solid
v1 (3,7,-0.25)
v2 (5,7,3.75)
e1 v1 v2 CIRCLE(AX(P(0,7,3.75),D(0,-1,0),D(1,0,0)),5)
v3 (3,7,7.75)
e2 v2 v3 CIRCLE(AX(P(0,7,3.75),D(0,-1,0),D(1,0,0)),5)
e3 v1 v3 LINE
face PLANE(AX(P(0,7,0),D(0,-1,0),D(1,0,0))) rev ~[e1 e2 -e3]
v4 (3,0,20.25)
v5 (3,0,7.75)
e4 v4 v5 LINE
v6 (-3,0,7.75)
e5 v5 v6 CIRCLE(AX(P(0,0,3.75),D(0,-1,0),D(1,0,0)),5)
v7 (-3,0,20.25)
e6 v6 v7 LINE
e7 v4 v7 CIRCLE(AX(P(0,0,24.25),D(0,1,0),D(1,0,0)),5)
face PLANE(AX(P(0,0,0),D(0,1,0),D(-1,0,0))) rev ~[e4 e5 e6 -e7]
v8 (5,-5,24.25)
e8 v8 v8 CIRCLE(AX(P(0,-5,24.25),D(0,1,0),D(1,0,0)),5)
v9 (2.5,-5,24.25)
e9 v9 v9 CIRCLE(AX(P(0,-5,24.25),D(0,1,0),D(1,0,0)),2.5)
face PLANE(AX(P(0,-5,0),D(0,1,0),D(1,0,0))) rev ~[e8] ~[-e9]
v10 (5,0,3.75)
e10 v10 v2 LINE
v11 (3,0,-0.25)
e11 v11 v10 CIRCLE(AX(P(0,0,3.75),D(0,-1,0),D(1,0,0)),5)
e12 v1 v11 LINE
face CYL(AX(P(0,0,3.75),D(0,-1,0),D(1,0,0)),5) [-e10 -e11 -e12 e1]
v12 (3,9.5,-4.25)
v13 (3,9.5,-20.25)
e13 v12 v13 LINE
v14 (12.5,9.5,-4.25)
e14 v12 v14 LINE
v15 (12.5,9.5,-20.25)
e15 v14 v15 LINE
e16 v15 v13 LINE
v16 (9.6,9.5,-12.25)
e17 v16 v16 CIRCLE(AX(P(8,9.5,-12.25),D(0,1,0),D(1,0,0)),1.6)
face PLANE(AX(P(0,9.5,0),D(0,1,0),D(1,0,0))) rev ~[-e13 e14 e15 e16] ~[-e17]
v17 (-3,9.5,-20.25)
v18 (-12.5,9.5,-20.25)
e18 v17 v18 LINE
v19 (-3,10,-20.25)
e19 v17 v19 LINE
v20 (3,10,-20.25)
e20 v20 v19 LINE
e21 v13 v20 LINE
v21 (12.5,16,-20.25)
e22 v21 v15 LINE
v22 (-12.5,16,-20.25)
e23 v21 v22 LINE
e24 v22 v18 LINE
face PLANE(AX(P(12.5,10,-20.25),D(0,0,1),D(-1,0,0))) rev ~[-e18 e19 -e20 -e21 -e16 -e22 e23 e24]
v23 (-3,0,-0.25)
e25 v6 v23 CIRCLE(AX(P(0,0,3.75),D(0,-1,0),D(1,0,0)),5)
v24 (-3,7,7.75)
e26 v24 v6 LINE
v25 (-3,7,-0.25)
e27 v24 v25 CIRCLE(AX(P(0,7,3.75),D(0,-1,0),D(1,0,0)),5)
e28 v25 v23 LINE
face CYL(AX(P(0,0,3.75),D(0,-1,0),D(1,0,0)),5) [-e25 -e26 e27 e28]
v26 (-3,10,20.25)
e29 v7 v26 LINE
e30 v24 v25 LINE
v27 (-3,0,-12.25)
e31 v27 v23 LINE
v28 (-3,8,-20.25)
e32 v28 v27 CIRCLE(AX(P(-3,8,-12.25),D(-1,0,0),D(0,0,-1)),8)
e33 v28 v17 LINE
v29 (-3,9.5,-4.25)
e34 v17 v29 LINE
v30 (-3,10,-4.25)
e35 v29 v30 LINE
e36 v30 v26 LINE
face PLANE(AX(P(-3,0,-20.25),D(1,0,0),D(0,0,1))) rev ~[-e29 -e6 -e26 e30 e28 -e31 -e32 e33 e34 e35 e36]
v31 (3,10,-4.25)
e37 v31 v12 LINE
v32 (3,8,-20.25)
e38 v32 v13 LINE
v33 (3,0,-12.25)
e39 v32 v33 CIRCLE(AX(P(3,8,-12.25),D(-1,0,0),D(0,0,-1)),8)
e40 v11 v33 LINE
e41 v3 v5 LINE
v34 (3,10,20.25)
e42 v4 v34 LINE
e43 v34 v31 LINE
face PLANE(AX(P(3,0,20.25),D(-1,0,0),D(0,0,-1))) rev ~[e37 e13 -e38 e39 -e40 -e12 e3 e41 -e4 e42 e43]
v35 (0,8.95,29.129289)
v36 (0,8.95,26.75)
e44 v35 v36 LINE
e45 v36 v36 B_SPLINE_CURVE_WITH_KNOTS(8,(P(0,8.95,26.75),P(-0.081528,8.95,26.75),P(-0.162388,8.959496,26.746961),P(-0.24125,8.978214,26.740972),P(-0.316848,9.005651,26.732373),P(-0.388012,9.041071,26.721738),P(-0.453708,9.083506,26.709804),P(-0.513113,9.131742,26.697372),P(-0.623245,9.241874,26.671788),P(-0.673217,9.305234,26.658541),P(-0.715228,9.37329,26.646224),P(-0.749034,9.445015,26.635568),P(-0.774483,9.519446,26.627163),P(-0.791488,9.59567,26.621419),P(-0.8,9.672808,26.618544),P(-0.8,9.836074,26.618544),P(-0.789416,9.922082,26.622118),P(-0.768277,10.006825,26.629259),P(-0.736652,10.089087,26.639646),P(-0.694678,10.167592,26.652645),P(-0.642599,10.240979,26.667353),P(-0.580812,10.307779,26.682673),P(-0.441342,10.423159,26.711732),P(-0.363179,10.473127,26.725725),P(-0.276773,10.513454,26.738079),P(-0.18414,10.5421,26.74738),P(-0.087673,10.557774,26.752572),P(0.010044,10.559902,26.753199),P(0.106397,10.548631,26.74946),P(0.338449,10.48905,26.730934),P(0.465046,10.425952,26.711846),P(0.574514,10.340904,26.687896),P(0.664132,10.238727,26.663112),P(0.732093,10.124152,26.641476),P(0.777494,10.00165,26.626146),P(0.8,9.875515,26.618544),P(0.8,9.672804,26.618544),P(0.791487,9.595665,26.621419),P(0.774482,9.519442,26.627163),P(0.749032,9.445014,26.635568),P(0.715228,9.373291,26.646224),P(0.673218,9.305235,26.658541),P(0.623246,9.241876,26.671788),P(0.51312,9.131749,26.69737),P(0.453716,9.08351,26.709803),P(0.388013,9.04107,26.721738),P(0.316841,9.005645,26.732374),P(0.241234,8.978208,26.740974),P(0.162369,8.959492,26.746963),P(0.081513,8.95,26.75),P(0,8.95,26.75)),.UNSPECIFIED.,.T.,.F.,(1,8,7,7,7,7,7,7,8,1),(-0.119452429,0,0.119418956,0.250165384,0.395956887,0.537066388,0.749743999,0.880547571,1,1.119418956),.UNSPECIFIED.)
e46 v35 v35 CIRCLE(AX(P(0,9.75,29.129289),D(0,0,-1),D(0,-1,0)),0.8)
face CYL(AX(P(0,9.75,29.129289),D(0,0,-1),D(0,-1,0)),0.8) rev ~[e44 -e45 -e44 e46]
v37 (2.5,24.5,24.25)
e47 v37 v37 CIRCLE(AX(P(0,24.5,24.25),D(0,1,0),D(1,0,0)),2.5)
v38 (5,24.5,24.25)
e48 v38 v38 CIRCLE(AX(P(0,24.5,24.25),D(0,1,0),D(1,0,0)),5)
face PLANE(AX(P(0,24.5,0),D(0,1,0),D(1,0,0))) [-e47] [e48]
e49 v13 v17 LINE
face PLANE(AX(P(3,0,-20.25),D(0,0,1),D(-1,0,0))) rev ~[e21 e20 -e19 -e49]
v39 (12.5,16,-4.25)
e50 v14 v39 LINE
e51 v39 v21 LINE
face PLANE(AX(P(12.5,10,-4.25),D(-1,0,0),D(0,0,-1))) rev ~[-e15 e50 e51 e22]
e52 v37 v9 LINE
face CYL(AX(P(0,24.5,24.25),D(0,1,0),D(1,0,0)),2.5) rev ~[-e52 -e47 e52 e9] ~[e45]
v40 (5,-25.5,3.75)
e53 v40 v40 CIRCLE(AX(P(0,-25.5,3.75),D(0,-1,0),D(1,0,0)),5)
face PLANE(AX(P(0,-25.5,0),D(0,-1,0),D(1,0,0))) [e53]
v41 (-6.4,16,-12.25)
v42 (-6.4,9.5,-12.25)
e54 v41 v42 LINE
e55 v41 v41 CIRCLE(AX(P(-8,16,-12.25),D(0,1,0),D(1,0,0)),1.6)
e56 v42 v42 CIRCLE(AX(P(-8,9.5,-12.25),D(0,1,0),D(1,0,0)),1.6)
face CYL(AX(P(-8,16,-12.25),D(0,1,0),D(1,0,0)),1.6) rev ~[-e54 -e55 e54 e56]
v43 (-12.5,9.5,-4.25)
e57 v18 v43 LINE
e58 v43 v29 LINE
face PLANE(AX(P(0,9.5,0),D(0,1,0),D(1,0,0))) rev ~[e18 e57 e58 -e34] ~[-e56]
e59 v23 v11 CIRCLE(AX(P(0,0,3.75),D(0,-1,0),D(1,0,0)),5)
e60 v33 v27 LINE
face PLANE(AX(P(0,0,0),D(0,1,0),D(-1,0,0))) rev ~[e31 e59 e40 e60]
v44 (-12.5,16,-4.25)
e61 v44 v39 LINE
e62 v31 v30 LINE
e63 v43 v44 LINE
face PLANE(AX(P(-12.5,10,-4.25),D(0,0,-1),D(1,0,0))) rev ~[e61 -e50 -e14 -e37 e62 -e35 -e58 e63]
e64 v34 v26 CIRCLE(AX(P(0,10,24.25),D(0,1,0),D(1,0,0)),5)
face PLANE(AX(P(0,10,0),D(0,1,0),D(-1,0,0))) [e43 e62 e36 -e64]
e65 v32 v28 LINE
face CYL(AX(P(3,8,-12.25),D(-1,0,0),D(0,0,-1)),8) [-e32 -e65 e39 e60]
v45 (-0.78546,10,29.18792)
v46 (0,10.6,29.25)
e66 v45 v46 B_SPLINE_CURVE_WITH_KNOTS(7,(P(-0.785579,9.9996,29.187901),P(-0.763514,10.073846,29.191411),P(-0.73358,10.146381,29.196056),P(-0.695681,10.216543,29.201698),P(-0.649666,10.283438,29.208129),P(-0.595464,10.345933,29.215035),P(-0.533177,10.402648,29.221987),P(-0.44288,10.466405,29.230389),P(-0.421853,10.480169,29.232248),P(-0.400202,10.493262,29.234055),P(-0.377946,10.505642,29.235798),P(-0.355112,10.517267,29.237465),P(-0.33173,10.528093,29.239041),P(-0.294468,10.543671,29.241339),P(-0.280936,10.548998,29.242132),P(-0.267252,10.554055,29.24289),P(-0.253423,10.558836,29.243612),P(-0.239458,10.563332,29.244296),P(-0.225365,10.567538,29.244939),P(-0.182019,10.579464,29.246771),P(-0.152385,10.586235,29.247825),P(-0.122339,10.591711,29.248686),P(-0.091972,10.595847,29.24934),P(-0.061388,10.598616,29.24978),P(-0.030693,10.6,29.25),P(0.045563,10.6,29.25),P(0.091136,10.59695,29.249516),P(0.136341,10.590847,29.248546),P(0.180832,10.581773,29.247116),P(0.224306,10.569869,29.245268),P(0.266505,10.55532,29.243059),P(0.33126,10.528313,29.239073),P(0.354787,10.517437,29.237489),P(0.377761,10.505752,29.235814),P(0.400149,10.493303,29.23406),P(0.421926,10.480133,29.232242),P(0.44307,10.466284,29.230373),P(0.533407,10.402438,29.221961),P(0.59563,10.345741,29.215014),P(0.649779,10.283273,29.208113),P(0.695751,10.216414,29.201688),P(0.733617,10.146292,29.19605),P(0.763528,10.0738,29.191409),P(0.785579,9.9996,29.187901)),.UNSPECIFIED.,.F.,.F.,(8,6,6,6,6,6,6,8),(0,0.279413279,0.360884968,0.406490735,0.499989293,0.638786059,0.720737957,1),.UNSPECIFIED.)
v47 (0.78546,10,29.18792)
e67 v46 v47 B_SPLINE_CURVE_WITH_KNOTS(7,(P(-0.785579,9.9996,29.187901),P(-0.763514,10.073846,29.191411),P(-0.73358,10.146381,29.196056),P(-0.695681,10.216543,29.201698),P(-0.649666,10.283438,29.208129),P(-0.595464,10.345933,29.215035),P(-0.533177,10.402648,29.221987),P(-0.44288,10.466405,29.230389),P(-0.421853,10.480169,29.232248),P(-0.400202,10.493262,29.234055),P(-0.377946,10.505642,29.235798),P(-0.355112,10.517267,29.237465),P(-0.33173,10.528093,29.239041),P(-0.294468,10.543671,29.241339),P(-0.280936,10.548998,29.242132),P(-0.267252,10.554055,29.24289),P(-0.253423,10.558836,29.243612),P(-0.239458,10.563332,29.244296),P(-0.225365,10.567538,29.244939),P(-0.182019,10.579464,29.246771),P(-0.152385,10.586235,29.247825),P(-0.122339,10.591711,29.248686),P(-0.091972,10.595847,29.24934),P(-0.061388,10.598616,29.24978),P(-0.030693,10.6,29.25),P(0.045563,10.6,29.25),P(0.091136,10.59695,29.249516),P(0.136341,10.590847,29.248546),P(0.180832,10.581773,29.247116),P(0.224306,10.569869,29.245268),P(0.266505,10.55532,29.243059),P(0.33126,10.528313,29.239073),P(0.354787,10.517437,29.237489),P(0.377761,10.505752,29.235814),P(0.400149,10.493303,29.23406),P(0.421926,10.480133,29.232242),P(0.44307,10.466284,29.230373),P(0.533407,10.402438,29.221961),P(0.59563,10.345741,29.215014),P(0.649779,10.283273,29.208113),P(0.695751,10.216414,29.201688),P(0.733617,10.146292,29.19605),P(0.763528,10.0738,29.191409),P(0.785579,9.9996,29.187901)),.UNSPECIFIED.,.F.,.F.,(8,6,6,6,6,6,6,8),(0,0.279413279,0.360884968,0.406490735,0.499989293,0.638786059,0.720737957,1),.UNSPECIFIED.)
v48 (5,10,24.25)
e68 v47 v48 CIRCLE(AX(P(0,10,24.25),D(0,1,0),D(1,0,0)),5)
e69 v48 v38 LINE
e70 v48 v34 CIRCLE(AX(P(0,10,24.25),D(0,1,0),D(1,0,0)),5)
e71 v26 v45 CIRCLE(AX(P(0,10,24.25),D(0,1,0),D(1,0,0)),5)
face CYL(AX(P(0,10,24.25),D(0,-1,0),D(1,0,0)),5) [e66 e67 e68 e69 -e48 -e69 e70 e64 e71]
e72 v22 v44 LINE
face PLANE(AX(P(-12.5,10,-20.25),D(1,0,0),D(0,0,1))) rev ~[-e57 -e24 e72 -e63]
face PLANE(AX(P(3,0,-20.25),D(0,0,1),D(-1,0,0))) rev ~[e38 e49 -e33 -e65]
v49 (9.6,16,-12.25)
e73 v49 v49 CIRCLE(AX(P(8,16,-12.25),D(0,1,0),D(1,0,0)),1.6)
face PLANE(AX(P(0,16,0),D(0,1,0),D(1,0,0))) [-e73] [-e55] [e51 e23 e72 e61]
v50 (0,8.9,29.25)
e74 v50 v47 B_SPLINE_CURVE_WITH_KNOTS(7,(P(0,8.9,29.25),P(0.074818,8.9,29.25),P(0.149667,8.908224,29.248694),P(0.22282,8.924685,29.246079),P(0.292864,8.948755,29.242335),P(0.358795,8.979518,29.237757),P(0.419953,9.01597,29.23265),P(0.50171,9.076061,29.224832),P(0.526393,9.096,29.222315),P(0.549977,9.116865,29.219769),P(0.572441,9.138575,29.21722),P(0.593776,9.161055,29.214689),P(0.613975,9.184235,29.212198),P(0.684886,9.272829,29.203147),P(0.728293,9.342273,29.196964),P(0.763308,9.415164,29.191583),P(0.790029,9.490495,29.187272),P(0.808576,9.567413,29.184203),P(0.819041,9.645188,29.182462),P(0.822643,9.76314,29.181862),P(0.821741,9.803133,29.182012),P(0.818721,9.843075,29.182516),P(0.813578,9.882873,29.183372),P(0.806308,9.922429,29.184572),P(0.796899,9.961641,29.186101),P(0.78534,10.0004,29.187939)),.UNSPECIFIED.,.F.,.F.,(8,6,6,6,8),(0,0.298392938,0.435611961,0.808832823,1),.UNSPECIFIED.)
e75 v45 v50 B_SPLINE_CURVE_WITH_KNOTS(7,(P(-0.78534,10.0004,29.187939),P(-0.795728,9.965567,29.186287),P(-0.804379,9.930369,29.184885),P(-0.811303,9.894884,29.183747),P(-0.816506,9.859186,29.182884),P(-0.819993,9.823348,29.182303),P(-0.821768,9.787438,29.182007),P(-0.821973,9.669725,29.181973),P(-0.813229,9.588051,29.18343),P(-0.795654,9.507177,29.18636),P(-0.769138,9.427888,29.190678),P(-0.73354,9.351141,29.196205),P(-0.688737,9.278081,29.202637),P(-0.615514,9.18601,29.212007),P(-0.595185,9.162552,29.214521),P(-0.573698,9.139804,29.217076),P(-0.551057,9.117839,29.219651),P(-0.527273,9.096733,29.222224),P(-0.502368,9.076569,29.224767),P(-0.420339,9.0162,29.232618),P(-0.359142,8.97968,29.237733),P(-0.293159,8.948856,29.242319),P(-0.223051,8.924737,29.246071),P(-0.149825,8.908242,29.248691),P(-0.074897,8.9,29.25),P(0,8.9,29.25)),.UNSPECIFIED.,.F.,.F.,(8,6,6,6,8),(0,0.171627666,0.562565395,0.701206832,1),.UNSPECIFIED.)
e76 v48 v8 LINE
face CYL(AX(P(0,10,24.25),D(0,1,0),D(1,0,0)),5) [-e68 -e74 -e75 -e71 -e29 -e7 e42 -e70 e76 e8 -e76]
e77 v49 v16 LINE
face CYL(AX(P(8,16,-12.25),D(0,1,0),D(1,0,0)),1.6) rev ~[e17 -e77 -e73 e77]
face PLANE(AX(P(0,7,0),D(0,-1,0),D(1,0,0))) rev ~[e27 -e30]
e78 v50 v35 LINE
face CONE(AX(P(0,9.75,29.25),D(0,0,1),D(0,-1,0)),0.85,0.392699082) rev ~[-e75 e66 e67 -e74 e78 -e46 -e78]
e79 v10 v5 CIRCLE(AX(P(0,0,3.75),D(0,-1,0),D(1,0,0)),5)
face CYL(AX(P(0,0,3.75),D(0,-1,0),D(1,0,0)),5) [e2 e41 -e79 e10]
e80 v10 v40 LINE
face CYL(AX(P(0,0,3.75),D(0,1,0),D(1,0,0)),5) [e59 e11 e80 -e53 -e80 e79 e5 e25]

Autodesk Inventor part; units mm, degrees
ref_plane "YZ Plane" through (0, 0, 0) normal (1, 0, 0) x (0, 1, 0)
ref_plane "XZ Plane" through (0, 0, 0) normal (0, 1, 0) x (-1, 0, 0)
sketch "Sketch1" plane through (0, 0, 0) normal (0, 1, 0) x (-1, 0, 0)
  line L0 (3, 20.25) -> (-3, 20.25)
  line L1 (-3, 20.25) -> (-3, -20.25)
  line L2 (-3, -20.25) -> (3, -20.25)
  line L3 (3, -20.25) -> (3, 20.25)
  line L4 (3, 20.25) -> (-3, -20.25) construction
  line L5 (-3, 20.25) -> (3, -20.25) construction
  point P0 (0, 0)
  dimension "d0" = 6
  dimension "d1" = 40.5
extrude "Extrusion1" add sketch "Sketch1" along normal blind 10
fillet "Fillet1" radius 8 1 edges at (0, 0, -20.25)
sketch "Sketch2" plane through (0, 10, 0) normal (0, 1, 0) x (1, 0, 0)
  line L0 (3, 20.25) -> (-3, 20.25) construction
  line L1 (0, 20.25) -> (0, -24.25) construction
  circle A0 centre (0, -24.25) radius 5
  point P0 (0, 0)
  dimension "d5" = 44.5
  dimension "d6" = 10
extrude "Extrusion2" add sketch "Sketch2" along normal blind 14.5 and the other way blind 15
sketch "Sketch3" plane through (0, 0, 0) normal (0, -1, 0) x (1, 0, 0)
  line L0 (3, -20.25) -> (-3, -20.25) construction
  line L1 (0, -20.25) -> (0, 3.75) construction
  circle A0 centre (0, 3.75) radius 5
  point P0 (0, 0)
  dimension "d11" = 24
  dimension "d12" = 10
extrude "Extrusion3" add sketch "Sketch3" along normal blind 25.5 and the other way blind 7
sketch "Sketch4" plane through (0, 10, 0) normal (0, 1, 0) x (1, 0, 0)
  line L0 (-3, 20.25) -> (3, 20.25) construction
  line L1 (0, 20.25) -> (0, 12.25) construction
  line L2 (-12.5, 4.25) -> (12.5, 4.25)
  line L3 (12.5, 4.25) -> (12.5, 20.25)
  line L4 (12.5, 20.25) -> (-12.5, 20.25)
  line L5 (-12.5, 20.25) -> (-12.5, 4.25)
  line L6 (-12.5, 4.25) -> (12.5, 20.25) construction
  line L7 (12.5, 4.25) -> (-12.5, 20.25) construction
  point P0 (0, 0)
  dimension "d17" = 8
  dimension "d18" = 25
extrude "Extrusion4" add sketch "Sketch4" along normal blind 6 and the other way blind 0.5
sketch "Sketch5" plane through (0, 16, 0) normal (0, 1, 0) x (1, 0, 0)
  line L0 (-3, 20.25) -> (3, 20.25) construction
  line L1 (0, 20.25) -> (0, 12.25) construction
  line L2 (0, 12.25) -> (-8, 12.25) construction
  circle A0 centre (-8, 12.25) radius 1.6
  circle A1 centre (8, 12.25) radius 1.6
  point P0 (0, 0)
  dimension "d23" = 8
  dimension "d24" = 8
  dimension "d25" = 3.2
extrude "Extrusion5" cut sketch "Sketch5" against normal through all
sketch "Sketch6" plane through (0, 24.5, 24.25) normal (0, 1, 0) x (1, 0, 0)
  circle A0 centre (0, 0) radius 2.5
  point P0 (0, 24.25)
  dimension "d28" = 5
extrude "Extrusion6" cut sketch "Sketch6" against normal through all
ref_plane "Work Plane1" through (0, 0, 29.25) normal (0, 0, 1) x (1, 0, 0)
sketch "Sketch8" plane through (0, 0, 29.25) normal (0, 0, 1) x (1, 0, 0)
  line L0 (5, 24.5) -> (-5, 24.5) projected
  line L1 (0, 24.5) -> (0, 9.75)
  circle A0 centre (0, 9.75) radius 0.8
  point P0 (0, 0)
  dimension "d39" = 14.75
  dimension "d40" = 1.6
hole "Hole2" at (0, 9.75, 29.25) direction (0, 0, -1) diameter 1.6 end up to surface countersink diameter 1.7 countersink angle 45
properties part number "Supporto SX"
